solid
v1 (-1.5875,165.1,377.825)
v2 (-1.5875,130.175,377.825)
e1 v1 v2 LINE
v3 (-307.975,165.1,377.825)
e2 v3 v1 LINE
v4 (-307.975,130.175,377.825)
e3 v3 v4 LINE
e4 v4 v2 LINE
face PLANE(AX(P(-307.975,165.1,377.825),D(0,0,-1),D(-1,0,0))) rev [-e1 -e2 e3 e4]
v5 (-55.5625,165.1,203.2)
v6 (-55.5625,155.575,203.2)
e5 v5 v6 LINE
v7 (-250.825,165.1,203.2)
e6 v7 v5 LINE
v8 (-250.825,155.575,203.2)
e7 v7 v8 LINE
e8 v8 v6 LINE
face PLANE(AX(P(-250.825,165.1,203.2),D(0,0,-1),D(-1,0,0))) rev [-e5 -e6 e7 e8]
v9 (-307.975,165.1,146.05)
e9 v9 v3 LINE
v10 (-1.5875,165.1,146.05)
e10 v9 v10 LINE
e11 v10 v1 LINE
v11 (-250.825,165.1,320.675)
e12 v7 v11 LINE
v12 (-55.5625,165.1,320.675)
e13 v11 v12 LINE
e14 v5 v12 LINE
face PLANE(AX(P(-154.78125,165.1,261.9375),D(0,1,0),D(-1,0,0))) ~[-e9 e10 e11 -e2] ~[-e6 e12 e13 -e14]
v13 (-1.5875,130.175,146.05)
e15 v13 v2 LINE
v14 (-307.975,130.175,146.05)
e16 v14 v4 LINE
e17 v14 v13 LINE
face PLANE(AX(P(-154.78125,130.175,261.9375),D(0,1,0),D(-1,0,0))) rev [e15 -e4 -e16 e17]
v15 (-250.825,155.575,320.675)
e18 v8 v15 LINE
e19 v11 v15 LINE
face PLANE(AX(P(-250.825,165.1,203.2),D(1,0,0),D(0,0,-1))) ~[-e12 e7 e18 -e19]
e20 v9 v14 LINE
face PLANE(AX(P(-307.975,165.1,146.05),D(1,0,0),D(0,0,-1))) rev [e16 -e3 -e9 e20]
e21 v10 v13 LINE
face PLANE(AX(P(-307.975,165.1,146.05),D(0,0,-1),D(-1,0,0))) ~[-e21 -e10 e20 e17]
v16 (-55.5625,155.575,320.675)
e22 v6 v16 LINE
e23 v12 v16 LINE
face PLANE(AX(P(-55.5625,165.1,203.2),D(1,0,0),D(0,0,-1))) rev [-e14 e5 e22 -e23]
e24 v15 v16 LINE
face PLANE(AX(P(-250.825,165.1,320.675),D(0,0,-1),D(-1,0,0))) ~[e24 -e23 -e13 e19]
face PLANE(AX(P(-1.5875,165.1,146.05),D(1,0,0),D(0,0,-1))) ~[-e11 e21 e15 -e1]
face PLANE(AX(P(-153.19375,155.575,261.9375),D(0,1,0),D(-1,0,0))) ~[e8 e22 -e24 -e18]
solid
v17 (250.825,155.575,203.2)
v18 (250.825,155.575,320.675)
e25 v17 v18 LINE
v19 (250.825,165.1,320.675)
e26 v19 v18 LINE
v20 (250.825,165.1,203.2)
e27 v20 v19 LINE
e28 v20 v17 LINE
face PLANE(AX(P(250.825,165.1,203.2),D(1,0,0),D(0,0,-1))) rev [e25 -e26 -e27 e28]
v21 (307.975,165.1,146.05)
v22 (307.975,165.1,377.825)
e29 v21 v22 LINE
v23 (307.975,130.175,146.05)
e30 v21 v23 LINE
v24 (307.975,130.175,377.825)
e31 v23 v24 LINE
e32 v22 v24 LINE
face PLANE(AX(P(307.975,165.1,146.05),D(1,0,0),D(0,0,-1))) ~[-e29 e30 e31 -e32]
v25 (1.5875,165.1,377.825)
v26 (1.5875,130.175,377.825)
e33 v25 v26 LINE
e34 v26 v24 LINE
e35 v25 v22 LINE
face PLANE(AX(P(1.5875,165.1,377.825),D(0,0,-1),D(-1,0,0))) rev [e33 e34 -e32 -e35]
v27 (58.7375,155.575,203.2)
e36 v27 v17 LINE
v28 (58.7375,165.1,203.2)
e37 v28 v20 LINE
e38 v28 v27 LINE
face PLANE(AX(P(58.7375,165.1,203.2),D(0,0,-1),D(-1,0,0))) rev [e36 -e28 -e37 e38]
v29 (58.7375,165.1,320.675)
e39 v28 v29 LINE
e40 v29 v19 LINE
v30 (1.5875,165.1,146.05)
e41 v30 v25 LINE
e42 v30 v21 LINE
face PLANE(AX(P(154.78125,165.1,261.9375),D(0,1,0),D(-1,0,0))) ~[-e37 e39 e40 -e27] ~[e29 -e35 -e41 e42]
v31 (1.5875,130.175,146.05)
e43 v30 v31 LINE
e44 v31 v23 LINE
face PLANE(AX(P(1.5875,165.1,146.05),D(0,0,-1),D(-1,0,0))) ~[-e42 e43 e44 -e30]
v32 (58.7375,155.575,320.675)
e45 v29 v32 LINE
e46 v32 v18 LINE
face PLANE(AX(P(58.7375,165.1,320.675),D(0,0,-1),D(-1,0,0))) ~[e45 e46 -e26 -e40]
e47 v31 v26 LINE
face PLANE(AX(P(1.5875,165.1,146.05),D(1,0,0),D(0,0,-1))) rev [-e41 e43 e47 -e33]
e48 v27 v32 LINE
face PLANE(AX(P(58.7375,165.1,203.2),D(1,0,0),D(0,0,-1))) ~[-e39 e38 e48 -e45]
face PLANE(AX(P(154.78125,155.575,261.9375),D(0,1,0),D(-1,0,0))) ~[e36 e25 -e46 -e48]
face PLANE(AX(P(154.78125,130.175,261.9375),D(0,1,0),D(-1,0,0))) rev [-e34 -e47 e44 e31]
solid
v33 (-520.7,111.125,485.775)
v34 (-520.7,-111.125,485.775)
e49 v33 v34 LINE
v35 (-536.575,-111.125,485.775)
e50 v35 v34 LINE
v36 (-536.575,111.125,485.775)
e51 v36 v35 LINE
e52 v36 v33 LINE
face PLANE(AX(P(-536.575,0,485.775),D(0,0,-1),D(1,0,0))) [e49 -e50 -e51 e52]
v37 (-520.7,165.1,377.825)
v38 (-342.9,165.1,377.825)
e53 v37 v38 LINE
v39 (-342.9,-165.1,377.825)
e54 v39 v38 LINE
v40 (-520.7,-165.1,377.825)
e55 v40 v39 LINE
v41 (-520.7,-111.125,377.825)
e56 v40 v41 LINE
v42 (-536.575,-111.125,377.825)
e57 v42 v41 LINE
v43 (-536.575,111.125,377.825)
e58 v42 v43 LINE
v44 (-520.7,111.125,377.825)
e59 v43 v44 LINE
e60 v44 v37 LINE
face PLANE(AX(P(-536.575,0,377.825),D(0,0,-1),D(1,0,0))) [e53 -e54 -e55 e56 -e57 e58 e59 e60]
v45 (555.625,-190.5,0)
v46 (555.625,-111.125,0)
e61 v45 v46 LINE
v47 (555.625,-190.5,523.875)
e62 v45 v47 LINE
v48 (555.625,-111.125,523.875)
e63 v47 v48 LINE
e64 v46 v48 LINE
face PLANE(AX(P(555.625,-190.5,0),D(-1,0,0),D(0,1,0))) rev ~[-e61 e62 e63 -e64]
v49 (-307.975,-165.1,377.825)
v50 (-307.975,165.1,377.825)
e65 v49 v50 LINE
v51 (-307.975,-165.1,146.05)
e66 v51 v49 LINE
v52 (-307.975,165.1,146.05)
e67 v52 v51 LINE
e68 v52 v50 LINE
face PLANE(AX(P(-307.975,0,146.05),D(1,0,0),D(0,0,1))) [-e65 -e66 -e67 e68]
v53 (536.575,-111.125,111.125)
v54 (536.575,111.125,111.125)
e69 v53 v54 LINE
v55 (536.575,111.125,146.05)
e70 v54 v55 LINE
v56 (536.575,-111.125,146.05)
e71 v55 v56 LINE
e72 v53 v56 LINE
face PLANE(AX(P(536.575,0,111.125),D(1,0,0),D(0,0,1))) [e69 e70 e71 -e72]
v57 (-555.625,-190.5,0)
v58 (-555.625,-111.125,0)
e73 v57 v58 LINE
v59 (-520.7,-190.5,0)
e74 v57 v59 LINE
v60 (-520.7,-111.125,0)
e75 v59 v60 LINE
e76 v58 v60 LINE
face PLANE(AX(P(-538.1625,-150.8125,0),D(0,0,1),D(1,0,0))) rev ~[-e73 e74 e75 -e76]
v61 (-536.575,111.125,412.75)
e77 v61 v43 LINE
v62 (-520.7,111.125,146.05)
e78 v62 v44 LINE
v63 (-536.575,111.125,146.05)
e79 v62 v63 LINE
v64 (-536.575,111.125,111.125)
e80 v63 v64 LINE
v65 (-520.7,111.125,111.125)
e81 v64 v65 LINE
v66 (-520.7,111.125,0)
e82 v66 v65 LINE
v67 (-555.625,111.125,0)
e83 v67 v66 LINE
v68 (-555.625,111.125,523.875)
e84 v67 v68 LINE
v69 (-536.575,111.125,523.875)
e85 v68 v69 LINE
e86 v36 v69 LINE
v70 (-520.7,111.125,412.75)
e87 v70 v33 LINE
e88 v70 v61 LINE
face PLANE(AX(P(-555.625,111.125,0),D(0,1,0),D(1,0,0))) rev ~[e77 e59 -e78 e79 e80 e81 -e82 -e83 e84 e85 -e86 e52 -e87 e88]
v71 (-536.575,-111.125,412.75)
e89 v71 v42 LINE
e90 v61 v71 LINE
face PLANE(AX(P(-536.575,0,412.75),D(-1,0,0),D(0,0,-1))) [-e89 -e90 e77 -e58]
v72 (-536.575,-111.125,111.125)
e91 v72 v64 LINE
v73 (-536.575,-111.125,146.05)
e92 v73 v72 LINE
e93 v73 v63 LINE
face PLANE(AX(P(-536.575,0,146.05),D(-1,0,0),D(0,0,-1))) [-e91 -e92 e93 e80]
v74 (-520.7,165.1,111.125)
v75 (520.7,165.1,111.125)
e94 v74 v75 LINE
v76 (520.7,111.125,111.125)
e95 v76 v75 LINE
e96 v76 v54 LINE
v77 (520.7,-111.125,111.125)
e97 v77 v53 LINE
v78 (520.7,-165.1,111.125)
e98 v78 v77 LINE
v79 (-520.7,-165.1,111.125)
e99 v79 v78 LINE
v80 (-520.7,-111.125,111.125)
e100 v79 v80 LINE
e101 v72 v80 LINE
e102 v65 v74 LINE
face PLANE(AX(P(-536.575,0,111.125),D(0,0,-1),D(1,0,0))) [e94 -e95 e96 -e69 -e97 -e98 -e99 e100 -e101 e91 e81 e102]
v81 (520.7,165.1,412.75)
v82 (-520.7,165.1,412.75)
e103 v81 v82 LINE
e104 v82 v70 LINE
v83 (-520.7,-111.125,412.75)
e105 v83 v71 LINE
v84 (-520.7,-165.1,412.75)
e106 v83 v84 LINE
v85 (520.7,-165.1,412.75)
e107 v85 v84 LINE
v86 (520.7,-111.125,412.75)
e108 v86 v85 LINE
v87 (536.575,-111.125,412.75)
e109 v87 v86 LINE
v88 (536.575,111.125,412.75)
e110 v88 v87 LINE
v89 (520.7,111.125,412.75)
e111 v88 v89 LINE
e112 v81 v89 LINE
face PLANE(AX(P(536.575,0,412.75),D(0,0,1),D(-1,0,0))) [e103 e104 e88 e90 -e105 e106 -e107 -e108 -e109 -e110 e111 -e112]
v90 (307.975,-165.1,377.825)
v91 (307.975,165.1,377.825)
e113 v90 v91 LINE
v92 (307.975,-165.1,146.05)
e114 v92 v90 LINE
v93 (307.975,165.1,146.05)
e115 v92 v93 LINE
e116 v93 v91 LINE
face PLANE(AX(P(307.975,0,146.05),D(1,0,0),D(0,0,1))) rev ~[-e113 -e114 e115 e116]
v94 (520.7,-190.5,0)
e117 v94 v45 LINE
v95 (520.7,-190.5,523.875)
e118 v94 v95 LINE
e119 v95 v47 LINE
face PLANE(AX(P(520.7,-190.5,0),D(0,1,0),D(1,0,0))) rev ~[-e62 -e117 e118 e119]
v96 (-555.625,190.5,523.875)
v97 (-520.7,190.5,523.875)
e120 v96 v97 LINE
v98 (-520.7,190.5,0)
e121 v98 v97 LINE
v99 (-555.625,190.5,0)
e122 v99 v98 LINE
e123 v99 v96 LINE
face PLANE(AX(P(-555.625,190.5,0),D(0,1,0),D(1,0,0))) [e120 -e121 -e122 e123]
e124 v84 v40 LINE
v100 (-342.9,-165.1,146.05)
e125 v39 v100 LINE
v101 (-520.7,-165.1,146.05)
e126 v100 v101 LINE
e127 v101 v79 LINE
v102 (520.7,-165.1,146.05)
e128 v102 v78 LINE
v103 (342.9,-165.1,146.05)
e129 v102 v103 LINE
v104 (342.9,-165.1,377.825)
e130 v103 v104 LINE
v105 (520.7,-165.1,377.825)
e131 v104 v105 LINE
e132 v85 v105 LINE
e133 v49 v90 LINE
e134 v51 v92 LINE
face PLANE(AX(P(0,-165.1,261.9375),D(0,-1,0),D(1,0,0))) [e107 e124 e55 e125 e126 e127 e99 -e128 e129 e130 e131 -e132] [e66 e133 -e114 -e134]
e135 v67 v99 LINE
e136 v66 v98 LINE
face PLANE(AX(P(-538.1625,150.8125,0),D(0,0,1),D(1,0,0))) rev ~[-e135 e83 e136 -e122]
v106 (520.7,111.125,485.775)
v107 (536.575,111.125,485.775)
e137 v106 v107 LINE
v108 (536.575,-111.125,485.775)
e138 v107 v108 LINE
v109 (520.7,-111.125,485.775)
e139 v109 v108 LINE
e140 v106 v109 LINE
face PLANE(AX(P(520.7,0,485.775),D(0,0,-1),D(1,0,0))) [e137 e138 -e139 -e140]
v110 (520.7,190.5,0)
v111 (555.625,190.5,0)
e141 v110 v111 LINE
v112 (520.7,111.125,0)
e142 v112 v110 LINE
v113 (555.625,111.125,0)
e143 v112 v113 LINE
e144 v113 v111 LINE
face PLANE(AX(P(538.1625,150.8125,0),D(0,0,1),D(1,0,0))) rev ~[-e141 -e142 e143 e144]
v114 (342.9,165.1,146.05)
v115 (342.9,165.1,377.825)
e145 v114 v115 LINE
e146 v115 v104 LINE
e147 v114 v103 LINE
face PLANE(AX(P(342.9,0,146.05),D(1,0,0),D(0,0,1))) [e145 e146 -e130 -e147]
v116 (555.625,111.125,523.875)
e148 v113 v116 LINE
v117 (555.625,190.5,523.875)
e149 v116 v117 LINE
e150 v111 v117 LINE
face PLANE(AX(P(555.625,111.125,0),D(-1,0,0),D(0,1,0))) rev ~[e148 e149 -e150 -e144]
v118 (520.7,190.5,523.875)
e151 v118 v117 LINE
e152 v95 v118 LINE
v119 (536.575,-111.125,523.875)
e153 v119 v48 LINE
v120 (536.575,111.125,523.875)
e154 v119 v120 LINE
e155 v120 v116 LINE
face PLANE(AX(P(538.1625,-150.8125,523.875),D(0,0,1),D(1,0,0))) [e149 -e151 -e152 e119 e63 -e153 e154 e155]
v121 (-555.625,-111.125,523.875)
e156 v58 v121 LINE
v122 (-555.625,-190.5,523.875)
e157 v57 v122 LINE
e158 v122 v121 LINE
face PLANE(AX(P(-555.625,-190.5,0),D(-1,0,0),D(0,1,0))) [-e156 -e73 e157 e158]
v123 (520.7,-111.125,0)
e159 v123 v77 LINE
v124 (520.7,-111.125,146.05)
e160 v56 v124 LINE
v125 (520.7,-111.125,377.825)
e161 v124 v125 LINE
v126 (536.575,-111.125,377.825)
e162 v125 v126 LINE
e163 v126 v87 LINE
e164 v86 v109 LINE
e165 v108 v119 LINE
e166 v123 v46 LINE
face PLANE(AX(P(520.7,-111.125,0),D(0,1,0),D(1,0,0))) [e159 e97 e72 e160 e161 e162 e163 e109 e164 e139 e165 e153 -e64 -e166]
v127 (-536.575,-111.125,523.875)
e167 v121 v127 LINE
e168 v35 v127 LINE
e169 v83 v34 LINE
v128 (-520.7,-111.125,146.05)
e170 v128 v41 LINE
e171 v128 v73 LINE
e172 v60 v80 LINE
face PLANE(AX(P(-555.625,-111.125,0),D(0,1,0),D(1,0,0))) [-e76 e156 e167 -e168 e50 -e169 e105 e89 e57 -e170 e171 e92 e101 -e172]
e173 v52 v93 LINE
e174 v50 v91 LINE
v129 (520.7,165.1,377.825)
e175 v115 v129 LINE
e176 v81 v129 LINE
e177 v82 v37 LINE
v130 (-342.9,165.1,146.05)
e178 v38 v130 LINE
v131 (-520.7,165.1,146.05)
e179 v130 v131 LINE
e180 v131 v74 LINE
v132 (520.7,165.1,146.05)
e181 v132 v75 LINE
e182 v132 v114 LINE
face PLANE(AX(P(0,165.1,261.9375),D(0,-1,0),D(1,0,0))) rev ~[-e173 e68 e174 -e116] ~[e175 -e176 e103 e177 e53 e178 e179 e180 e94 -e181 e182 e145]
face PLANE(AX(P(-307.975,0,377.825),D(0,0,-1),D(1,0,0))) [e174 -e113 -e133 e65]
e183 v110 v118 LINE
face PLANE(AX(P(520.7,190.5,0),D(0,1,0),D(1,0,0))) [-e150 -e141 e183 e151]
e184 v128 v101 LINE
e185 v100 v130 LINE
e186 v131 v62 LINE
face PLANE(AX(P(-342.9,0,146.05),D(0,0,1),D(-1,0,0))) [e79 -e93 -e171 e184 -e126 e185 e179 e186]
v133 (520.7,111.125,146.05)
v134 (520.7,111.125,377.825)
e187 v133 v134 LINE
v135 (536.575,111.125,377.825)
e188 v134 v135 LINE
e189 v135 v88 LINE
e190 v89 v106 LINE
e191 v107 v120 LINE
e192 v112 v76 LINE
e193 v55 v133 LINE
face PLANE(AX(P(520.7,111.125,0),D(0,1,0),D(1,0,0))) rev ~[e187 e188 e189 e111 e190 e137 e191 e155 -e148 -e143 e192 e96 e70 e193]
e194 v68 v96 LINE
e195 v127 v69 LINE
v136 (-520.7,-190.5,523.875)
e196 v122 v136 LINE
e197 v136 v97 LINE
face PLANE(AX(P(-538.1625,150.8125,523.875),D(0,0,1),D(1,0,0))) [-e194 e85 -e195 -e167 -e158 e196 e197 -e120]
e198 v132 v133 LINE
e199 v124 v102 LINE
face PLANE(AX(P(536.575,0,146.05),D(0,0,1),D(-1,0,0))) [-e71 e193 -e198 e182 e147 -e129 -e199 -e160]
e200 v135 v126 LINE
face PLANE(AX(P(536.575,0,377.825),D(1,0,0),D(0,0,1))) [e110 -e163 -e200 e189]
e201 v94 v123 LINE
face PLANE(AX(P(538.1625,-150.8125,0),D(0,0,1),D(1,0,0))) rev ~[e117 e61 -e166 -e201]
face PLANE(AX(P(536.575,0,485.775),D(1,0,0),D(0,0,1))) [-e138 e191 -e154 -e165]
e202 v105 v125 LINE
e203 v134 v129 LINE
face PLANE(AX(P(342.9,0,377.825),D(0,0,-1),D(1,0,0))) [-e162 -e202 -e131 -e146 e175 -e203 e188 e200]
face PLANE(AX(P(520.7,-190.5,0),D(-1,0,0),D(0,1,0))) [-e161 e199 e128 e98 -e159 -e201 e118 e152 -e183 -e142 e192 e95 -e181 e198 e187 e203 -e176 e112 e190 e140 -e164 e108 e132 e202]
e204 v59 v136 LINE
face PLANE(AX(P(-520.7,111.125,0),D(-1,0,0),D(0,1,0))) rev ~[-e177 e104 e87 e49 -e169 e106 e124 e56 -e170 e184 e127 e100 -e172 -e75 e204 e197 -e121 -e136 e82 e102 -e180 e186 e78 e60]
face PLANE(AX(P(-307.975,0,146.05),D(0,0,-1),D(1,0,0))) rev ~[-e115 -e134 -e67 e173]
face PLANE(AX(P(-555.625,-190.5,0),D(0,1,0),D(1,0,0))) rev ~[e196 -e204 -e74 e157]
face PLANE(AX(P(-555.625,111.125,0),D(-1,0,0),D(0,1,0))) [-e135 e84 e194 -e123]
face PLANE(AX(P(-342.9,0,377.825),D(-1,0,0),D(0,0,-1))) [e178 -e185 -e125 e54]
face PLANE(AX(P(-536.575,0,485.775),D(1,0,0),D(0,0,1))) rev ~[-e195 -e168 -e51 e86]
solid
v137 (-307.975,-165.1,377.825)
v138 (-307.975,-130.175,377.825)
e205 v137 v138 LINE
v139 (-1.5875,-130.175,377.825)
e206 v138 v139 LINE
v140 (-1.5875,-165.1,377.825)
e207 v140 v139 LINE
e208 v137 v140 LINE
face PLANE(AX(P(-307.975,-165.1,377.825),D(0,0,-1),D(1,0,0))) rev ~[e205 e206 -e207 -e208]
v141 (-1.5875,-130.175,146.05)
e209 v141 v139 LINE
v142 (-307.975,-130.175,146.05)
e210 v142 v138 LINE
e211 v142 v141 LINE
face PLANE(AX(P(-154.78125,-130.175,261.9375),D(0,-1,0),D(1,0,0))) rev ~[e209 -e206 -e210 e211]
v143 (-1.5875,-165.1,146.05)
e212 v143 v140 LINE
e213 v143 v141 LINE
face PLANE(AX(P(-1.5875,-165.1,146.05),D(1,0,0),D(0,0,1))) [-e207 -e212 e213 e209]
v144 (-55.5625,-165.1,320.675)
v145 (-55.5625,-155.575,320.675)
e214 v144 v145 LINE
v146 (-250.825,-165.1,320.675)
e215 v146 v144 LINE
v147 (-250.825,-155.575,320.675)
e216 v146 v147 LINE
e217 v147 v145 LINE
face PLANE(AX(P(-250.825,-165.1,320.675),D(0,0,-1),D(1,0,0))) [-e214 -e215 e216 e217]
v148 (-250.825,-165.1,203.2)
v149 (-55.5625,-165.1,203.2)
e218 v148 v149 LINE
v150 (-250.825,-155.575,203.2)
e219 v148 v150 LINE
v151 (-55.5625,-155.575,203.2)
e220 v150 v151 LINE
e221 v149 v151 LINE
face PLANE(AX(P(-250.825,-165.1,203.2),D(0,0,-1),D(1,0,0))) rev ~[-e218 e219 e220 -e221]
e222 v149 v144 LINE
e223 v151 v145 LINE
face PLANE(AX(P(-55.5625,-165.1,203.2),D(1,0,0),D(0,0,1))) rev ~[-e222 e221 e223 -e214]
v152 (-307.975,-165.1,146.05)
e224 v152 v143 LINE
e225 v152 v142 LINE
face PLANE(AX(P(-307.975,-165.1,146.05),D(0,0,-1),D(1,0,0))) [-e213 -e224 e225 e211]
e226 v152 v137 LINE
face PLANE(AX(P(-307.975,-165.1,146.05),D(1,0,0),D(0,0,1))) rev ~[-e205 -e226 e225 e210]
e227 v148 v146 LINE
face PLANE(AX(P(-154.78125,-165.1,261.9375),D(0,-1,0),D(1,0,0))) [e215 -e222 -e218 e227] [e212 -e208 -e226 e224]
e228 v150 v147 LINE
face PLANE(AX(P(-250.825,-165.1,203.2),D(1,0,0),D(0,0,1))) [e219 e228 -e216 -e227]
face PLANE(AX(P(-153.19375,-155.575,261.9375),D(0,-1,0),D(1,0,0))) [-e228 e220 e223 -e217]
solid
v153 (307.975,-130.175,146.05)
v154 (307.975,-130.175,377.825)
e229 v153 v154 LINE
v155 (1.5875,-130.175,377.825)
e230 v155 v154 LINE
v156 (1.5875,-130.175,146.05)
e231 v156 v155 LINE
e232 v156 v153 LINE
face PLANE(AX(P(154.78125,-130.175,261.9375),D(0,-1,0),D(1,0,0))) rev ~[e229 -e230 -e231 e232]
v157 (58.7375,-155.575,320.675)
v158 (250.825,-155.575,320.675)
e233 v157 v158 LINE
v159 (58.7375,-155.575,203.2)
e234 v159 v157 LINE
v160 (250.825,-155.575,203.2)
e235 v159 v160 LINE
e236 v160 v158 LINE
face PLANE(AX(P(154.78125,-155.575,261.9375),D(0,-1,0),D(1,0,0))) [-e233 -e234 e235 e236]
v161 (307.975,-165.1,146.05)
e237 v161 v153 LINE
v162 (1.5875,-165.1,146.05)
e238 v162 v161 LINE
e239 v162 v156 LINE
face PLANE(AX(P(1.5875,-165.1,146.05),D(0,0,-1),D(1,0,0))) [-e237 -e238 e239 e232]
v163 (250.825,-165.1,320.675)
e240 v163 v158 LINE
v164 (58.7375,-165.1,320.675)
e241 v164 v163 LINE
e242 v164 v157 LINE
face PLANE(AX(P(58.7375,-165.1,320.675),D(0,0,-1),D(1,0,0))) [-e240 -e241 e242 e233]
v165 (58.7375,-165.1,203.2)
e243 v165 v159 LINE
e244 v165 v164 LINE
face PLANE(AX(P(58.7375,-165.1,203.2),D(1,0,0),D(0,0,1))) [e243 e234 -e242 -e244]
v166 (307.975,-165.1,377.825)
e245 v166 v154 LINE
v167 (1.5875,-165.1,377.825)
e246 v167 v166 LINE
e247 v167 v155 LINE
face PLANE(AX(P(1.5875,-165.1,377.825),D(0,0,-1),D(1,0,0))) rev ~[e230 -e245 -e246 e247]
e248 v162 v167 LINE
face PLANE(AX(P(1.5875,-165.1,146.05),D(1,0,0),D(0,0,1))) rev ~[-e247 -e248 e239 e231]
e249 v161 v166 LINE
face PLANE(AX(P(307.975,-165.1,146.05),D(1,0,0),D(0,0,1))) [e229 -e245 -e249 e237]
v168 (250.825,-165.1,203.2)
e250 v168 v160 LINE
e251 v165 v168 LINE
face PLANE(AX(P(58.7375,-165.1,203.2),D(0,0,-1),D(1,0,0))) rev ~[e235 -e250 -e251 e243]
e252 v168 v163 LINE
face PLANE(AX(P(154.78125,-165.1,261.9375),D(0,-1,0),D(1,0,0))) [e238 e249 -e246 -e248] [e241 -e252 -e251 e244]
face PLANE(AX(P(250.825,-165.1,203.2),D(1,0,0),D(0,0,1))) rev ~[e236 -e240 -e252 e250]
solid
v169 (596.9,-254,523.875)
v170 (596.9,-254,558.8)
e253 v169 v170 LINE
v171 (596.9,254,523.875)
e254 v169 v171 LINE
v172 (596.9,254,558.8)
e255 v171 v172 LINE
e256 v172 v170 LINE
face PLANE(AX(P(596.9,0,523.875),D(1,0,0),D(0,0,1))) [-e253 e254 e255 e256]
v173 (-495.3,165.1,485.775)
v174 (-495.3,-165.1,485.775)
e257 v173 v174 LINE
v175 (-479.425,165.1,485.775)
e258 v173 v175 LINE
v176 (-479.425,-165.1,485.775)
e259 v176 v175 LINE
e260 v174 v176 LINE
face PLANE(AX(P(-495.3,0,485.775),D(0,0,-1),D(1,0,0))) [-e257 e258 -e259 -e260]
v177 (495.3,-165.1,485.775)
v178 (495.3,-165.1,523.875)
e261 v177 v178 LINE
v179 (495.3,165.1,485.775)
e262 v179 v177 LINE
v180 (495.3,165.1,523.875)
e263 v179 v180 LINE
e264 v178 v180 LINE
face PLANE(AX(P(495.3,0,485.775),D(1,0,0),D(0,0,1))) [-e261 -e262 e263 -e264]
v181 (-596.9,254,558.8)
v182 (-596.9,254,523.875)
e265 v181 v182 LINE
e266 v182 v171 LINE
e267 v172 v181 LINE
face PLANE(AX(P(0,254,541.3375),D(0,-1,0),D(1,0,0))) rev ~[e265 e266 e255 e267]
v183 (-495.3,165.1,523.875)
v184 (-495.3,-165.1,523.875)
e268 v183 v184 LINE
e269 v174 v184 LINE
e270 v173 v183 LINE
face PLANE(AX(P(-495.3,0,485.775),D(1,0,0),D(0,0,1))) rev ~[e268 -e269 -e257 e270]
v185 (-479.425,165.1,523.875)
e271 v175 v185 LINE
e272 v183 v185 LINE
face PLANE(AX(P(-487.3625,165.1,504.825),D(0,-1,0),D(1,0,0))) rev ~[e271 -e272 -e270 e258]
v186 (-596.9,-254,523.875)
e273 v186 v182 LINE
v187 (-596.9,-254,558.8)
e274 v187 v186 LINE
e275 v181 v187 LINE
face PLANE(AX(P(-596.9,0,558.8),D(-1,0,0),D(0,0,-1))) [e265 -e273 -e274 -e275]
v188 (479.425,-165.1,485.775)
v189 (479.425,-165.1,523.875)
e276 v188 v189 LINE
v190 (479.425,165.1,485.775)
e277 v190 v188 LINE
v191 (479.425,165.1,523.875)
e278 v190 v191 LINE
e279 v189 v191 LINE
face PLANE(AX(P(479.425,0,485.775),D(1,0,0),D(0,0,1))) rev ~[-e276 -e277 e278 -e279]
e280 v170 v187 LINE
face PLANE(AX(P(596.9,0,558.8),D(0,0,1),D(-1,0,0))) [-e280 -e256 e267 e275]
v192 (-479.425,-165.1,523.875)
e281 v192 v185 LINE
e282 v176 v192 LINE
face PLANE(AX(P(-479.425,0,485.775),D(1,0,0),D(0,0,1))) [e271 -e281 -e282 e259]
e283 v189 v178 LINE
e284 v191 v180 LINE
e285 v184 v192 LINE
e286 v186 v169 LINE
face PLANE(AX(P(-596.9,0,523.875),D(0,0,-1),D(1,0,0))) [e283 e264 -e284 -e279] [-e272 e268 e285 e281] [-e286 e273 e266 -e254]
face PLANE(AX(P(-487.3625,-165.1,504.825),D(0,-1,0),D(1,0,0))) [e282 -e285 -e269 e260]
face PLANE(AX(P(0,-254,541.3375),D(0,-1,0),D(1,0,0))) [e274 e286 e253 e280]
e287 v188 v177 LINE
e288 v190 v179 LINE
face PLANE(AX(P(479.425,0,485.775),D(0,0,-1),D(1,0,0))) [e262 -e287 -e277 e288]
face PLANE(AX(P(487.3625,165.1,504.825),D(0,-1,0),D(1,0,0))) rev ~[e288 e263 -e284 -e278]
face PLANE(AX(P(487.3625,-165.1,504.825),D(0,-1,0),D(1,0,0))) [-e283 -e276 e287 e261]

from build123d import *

# Parameters (mm, degrees)
F1_DEPTH      = 254
F0_W          = 615.95
F0_H          = 231.775
F2_DEPTH      = 165.1
F2_DEPTH_BACK = 165.1
F0_W_2        = 15.875
F0_H_2        = 38.1
F3_W          = 34.925
F3_H          = 79.375
F4_DEPTH      = 523.875
F5_W          = 306.3875
F5_H          = 231.775
F5_W_2        = 195.2625
F5_H_2        = 117.475
F6_DEPTH      = 34.925
F5_W_3        = 192.0875
F7_DEPTH      = 9.525


with BuildPart() as f1:
    # F0 (on Front) → F1 (new body, symmetric)
    with BuildSketch(Plane.XZ):
        Polygon((596.9, 523.875), (596.9, 558.8), (-596.9, 558.8), (-596.9, 523.875), (-536.575, 523.875), (-520.7, 523.875), (-495.3, 523.875), (-479.425, 523.875), (479.425, 523.875), (495.3, 523.875), (520.7, 523.875), (536.575, 523.875), align=None)
    extrude(amount=F1_DEPTH, both=True)

    # F0 (on Front) → F2, piece 3 (join, two sides)
    with BuildSketch(Plane.XZ) as f2_3_sk:
        with Locations((487.3625, 504.825)):
            Rectangle(F0_W_2, F0_H_2)
        with Locations((-487.3625, 504.825)):
            Rectangle(F0_W_2, F0_H_2)
    extrude(amount=F2_DEPTH)
    extrude(f2_3_sk.sketch, amount=-F2_DEPTH_BACK)


with BuildPart() as f2:
    # F0 (on Front) → F2 (new body, two sides)
    with BuildSketch(Plane.XZ) as f2_sk:
        Polygon((536.575, 111.125), (536.575, 146.05), (342.9, 146.05), (342.9, 377.825), (536.575, 377.825), (536.575, 412.75), (-536.575, 412.75), (-536.575, 377.825), (-342.9, 377.825), (-342.9, 146.05), (-536.575, 146.05), (-536.575, 111.125), align=None)
        with Locations((0, 261.9375)):
            Rectangle(F0_W, F0_H, mode=Mode.SUBTRACT)
    extrude(amount=F2_DEPTH)
    extrude(f2_sk.sketch, amount=-F2_DEPTH_BACK)



with BuildPart() as f2b:
    # F0 (on Front) → F2, piece 2 (new body, two sides)
    with BuildSketch(Plane.XZ) as f2_2_sk:
        with Locations((528.6375, 504.825)):
            Rectangle(F0_W_2, F0_H_2)
    extrude(amount=F2_DEPTH)
    extrude(f2_2_sk.sketch, amount=-F2_DEPTH_BACK)


with BuildPart() as f2c:
    # F0 (on Front) → F2, piece 4 (new body, two sides)
    with BuildSketch(Plane.XZ) as f2_4_sk:
        with Locations((-528.6375, 504.825)):
            Rectangle(F0_W_2, F0_H_2)
    extrude(amount=F2_DEPTH)
    extrude(f2_4_sk.sketch, amount=-F2_DEPTH_BACK)


with BuildPart() as f2_1:
    add(f2.part)

    add(f2b.part)  # F4 merges F2b

    add(f2c.part)  # F4 merges F2c
    # F3 (on Top) → F4 (join, through all)
    with BuildSketch(Plane.XY):
        with Locations((-538.1625, 150.8125)):
            Rectangle(F3_W, F3_H)
        with Locations((-538.1625, -150.8125)):
            Rectangle(F3_W, F3_H)
        with Locations((538.1625, -150.8125)):
            Rectangle(F3_W, F3_H)
        with Locations((538.1625, 150.8125)):
            Rectangle(F3_W, F3_H)
    extrude(amount=F4_DEPTH)


with BuildPart() as f6:
    # F5 (on face) → F6 (new body)
    with BuildSketch(Plane.XZ.offset(165.1)):
        with Locations((-154.78125, 261.9375)):
            Rectangle(F5_W, F5_H)
        with Locations((-153.19375, 261.9375)):
            Rectangle(F5_W_2, F5_H_2, mode=Mode.SUBTRACT)
        with Locations((-153.19375, 261.9375)):
            Rectangle(F5_W_2, F5_H_2)
    extrude(amount=-F6_DEPTH)


with BuildPart() as f6b:
    # F5 (on face) → F6, piece 2 (new body)
    with BuildSketch(Plane.XZ.offset(165.1)):
        with Locations((154.78125, 261.9375)):
            Rectangle(F5_W, F5_H)
        with Locations((154.78125, 261.9375)):
            Rectangle(F5_W_3, F5_H_2, mode=Mode.SUBTRACT)
        with Locations((154.78125, 261.9375)):
            Rectangle(F5_W_3, F5_H_2)
    extrude(amount=-F6_DEPTH)


with BuildPart() as f7_tool:
    # F5 (on face) → F7 (new body)
    with BuildSketch(Plane.XZ.offset(165.1)):
        with Locations((-153.19375, 261.9375)):
            Rectangle(F5_W_2, F5_H_2)
        with Locations((154.78125, 261.9375)):
            Rectangle(F5_W_3, F5_H_2)
    extrude(amount=-F7_DEPTH)


with BuildPart() as f6_1:
    add(f6.part)

    # F7: cut by f7_tool
    add(f7_tool.part, mode=Mode.SUBTRACT)


with BuildPart() as f6b_1:
    add(f6b.part)

    # F7: cut by f7_tool
    add(f7_tool.part, mode=Mode.SUBTRACT)


with BuildPart() as f8_1:
    # F8: instance of F6
    add(f6_1.part.mirror(Plane.XZ))


with BuildPart() as f8_2:
    # F8: instance of F6b
    add(f6b_1.part.mirror(Plane.XZ))


solid = Compound([f1.part, f2_1.part, f6_1.part, f6b_1.part, f8_1.part, f8_2.part])
